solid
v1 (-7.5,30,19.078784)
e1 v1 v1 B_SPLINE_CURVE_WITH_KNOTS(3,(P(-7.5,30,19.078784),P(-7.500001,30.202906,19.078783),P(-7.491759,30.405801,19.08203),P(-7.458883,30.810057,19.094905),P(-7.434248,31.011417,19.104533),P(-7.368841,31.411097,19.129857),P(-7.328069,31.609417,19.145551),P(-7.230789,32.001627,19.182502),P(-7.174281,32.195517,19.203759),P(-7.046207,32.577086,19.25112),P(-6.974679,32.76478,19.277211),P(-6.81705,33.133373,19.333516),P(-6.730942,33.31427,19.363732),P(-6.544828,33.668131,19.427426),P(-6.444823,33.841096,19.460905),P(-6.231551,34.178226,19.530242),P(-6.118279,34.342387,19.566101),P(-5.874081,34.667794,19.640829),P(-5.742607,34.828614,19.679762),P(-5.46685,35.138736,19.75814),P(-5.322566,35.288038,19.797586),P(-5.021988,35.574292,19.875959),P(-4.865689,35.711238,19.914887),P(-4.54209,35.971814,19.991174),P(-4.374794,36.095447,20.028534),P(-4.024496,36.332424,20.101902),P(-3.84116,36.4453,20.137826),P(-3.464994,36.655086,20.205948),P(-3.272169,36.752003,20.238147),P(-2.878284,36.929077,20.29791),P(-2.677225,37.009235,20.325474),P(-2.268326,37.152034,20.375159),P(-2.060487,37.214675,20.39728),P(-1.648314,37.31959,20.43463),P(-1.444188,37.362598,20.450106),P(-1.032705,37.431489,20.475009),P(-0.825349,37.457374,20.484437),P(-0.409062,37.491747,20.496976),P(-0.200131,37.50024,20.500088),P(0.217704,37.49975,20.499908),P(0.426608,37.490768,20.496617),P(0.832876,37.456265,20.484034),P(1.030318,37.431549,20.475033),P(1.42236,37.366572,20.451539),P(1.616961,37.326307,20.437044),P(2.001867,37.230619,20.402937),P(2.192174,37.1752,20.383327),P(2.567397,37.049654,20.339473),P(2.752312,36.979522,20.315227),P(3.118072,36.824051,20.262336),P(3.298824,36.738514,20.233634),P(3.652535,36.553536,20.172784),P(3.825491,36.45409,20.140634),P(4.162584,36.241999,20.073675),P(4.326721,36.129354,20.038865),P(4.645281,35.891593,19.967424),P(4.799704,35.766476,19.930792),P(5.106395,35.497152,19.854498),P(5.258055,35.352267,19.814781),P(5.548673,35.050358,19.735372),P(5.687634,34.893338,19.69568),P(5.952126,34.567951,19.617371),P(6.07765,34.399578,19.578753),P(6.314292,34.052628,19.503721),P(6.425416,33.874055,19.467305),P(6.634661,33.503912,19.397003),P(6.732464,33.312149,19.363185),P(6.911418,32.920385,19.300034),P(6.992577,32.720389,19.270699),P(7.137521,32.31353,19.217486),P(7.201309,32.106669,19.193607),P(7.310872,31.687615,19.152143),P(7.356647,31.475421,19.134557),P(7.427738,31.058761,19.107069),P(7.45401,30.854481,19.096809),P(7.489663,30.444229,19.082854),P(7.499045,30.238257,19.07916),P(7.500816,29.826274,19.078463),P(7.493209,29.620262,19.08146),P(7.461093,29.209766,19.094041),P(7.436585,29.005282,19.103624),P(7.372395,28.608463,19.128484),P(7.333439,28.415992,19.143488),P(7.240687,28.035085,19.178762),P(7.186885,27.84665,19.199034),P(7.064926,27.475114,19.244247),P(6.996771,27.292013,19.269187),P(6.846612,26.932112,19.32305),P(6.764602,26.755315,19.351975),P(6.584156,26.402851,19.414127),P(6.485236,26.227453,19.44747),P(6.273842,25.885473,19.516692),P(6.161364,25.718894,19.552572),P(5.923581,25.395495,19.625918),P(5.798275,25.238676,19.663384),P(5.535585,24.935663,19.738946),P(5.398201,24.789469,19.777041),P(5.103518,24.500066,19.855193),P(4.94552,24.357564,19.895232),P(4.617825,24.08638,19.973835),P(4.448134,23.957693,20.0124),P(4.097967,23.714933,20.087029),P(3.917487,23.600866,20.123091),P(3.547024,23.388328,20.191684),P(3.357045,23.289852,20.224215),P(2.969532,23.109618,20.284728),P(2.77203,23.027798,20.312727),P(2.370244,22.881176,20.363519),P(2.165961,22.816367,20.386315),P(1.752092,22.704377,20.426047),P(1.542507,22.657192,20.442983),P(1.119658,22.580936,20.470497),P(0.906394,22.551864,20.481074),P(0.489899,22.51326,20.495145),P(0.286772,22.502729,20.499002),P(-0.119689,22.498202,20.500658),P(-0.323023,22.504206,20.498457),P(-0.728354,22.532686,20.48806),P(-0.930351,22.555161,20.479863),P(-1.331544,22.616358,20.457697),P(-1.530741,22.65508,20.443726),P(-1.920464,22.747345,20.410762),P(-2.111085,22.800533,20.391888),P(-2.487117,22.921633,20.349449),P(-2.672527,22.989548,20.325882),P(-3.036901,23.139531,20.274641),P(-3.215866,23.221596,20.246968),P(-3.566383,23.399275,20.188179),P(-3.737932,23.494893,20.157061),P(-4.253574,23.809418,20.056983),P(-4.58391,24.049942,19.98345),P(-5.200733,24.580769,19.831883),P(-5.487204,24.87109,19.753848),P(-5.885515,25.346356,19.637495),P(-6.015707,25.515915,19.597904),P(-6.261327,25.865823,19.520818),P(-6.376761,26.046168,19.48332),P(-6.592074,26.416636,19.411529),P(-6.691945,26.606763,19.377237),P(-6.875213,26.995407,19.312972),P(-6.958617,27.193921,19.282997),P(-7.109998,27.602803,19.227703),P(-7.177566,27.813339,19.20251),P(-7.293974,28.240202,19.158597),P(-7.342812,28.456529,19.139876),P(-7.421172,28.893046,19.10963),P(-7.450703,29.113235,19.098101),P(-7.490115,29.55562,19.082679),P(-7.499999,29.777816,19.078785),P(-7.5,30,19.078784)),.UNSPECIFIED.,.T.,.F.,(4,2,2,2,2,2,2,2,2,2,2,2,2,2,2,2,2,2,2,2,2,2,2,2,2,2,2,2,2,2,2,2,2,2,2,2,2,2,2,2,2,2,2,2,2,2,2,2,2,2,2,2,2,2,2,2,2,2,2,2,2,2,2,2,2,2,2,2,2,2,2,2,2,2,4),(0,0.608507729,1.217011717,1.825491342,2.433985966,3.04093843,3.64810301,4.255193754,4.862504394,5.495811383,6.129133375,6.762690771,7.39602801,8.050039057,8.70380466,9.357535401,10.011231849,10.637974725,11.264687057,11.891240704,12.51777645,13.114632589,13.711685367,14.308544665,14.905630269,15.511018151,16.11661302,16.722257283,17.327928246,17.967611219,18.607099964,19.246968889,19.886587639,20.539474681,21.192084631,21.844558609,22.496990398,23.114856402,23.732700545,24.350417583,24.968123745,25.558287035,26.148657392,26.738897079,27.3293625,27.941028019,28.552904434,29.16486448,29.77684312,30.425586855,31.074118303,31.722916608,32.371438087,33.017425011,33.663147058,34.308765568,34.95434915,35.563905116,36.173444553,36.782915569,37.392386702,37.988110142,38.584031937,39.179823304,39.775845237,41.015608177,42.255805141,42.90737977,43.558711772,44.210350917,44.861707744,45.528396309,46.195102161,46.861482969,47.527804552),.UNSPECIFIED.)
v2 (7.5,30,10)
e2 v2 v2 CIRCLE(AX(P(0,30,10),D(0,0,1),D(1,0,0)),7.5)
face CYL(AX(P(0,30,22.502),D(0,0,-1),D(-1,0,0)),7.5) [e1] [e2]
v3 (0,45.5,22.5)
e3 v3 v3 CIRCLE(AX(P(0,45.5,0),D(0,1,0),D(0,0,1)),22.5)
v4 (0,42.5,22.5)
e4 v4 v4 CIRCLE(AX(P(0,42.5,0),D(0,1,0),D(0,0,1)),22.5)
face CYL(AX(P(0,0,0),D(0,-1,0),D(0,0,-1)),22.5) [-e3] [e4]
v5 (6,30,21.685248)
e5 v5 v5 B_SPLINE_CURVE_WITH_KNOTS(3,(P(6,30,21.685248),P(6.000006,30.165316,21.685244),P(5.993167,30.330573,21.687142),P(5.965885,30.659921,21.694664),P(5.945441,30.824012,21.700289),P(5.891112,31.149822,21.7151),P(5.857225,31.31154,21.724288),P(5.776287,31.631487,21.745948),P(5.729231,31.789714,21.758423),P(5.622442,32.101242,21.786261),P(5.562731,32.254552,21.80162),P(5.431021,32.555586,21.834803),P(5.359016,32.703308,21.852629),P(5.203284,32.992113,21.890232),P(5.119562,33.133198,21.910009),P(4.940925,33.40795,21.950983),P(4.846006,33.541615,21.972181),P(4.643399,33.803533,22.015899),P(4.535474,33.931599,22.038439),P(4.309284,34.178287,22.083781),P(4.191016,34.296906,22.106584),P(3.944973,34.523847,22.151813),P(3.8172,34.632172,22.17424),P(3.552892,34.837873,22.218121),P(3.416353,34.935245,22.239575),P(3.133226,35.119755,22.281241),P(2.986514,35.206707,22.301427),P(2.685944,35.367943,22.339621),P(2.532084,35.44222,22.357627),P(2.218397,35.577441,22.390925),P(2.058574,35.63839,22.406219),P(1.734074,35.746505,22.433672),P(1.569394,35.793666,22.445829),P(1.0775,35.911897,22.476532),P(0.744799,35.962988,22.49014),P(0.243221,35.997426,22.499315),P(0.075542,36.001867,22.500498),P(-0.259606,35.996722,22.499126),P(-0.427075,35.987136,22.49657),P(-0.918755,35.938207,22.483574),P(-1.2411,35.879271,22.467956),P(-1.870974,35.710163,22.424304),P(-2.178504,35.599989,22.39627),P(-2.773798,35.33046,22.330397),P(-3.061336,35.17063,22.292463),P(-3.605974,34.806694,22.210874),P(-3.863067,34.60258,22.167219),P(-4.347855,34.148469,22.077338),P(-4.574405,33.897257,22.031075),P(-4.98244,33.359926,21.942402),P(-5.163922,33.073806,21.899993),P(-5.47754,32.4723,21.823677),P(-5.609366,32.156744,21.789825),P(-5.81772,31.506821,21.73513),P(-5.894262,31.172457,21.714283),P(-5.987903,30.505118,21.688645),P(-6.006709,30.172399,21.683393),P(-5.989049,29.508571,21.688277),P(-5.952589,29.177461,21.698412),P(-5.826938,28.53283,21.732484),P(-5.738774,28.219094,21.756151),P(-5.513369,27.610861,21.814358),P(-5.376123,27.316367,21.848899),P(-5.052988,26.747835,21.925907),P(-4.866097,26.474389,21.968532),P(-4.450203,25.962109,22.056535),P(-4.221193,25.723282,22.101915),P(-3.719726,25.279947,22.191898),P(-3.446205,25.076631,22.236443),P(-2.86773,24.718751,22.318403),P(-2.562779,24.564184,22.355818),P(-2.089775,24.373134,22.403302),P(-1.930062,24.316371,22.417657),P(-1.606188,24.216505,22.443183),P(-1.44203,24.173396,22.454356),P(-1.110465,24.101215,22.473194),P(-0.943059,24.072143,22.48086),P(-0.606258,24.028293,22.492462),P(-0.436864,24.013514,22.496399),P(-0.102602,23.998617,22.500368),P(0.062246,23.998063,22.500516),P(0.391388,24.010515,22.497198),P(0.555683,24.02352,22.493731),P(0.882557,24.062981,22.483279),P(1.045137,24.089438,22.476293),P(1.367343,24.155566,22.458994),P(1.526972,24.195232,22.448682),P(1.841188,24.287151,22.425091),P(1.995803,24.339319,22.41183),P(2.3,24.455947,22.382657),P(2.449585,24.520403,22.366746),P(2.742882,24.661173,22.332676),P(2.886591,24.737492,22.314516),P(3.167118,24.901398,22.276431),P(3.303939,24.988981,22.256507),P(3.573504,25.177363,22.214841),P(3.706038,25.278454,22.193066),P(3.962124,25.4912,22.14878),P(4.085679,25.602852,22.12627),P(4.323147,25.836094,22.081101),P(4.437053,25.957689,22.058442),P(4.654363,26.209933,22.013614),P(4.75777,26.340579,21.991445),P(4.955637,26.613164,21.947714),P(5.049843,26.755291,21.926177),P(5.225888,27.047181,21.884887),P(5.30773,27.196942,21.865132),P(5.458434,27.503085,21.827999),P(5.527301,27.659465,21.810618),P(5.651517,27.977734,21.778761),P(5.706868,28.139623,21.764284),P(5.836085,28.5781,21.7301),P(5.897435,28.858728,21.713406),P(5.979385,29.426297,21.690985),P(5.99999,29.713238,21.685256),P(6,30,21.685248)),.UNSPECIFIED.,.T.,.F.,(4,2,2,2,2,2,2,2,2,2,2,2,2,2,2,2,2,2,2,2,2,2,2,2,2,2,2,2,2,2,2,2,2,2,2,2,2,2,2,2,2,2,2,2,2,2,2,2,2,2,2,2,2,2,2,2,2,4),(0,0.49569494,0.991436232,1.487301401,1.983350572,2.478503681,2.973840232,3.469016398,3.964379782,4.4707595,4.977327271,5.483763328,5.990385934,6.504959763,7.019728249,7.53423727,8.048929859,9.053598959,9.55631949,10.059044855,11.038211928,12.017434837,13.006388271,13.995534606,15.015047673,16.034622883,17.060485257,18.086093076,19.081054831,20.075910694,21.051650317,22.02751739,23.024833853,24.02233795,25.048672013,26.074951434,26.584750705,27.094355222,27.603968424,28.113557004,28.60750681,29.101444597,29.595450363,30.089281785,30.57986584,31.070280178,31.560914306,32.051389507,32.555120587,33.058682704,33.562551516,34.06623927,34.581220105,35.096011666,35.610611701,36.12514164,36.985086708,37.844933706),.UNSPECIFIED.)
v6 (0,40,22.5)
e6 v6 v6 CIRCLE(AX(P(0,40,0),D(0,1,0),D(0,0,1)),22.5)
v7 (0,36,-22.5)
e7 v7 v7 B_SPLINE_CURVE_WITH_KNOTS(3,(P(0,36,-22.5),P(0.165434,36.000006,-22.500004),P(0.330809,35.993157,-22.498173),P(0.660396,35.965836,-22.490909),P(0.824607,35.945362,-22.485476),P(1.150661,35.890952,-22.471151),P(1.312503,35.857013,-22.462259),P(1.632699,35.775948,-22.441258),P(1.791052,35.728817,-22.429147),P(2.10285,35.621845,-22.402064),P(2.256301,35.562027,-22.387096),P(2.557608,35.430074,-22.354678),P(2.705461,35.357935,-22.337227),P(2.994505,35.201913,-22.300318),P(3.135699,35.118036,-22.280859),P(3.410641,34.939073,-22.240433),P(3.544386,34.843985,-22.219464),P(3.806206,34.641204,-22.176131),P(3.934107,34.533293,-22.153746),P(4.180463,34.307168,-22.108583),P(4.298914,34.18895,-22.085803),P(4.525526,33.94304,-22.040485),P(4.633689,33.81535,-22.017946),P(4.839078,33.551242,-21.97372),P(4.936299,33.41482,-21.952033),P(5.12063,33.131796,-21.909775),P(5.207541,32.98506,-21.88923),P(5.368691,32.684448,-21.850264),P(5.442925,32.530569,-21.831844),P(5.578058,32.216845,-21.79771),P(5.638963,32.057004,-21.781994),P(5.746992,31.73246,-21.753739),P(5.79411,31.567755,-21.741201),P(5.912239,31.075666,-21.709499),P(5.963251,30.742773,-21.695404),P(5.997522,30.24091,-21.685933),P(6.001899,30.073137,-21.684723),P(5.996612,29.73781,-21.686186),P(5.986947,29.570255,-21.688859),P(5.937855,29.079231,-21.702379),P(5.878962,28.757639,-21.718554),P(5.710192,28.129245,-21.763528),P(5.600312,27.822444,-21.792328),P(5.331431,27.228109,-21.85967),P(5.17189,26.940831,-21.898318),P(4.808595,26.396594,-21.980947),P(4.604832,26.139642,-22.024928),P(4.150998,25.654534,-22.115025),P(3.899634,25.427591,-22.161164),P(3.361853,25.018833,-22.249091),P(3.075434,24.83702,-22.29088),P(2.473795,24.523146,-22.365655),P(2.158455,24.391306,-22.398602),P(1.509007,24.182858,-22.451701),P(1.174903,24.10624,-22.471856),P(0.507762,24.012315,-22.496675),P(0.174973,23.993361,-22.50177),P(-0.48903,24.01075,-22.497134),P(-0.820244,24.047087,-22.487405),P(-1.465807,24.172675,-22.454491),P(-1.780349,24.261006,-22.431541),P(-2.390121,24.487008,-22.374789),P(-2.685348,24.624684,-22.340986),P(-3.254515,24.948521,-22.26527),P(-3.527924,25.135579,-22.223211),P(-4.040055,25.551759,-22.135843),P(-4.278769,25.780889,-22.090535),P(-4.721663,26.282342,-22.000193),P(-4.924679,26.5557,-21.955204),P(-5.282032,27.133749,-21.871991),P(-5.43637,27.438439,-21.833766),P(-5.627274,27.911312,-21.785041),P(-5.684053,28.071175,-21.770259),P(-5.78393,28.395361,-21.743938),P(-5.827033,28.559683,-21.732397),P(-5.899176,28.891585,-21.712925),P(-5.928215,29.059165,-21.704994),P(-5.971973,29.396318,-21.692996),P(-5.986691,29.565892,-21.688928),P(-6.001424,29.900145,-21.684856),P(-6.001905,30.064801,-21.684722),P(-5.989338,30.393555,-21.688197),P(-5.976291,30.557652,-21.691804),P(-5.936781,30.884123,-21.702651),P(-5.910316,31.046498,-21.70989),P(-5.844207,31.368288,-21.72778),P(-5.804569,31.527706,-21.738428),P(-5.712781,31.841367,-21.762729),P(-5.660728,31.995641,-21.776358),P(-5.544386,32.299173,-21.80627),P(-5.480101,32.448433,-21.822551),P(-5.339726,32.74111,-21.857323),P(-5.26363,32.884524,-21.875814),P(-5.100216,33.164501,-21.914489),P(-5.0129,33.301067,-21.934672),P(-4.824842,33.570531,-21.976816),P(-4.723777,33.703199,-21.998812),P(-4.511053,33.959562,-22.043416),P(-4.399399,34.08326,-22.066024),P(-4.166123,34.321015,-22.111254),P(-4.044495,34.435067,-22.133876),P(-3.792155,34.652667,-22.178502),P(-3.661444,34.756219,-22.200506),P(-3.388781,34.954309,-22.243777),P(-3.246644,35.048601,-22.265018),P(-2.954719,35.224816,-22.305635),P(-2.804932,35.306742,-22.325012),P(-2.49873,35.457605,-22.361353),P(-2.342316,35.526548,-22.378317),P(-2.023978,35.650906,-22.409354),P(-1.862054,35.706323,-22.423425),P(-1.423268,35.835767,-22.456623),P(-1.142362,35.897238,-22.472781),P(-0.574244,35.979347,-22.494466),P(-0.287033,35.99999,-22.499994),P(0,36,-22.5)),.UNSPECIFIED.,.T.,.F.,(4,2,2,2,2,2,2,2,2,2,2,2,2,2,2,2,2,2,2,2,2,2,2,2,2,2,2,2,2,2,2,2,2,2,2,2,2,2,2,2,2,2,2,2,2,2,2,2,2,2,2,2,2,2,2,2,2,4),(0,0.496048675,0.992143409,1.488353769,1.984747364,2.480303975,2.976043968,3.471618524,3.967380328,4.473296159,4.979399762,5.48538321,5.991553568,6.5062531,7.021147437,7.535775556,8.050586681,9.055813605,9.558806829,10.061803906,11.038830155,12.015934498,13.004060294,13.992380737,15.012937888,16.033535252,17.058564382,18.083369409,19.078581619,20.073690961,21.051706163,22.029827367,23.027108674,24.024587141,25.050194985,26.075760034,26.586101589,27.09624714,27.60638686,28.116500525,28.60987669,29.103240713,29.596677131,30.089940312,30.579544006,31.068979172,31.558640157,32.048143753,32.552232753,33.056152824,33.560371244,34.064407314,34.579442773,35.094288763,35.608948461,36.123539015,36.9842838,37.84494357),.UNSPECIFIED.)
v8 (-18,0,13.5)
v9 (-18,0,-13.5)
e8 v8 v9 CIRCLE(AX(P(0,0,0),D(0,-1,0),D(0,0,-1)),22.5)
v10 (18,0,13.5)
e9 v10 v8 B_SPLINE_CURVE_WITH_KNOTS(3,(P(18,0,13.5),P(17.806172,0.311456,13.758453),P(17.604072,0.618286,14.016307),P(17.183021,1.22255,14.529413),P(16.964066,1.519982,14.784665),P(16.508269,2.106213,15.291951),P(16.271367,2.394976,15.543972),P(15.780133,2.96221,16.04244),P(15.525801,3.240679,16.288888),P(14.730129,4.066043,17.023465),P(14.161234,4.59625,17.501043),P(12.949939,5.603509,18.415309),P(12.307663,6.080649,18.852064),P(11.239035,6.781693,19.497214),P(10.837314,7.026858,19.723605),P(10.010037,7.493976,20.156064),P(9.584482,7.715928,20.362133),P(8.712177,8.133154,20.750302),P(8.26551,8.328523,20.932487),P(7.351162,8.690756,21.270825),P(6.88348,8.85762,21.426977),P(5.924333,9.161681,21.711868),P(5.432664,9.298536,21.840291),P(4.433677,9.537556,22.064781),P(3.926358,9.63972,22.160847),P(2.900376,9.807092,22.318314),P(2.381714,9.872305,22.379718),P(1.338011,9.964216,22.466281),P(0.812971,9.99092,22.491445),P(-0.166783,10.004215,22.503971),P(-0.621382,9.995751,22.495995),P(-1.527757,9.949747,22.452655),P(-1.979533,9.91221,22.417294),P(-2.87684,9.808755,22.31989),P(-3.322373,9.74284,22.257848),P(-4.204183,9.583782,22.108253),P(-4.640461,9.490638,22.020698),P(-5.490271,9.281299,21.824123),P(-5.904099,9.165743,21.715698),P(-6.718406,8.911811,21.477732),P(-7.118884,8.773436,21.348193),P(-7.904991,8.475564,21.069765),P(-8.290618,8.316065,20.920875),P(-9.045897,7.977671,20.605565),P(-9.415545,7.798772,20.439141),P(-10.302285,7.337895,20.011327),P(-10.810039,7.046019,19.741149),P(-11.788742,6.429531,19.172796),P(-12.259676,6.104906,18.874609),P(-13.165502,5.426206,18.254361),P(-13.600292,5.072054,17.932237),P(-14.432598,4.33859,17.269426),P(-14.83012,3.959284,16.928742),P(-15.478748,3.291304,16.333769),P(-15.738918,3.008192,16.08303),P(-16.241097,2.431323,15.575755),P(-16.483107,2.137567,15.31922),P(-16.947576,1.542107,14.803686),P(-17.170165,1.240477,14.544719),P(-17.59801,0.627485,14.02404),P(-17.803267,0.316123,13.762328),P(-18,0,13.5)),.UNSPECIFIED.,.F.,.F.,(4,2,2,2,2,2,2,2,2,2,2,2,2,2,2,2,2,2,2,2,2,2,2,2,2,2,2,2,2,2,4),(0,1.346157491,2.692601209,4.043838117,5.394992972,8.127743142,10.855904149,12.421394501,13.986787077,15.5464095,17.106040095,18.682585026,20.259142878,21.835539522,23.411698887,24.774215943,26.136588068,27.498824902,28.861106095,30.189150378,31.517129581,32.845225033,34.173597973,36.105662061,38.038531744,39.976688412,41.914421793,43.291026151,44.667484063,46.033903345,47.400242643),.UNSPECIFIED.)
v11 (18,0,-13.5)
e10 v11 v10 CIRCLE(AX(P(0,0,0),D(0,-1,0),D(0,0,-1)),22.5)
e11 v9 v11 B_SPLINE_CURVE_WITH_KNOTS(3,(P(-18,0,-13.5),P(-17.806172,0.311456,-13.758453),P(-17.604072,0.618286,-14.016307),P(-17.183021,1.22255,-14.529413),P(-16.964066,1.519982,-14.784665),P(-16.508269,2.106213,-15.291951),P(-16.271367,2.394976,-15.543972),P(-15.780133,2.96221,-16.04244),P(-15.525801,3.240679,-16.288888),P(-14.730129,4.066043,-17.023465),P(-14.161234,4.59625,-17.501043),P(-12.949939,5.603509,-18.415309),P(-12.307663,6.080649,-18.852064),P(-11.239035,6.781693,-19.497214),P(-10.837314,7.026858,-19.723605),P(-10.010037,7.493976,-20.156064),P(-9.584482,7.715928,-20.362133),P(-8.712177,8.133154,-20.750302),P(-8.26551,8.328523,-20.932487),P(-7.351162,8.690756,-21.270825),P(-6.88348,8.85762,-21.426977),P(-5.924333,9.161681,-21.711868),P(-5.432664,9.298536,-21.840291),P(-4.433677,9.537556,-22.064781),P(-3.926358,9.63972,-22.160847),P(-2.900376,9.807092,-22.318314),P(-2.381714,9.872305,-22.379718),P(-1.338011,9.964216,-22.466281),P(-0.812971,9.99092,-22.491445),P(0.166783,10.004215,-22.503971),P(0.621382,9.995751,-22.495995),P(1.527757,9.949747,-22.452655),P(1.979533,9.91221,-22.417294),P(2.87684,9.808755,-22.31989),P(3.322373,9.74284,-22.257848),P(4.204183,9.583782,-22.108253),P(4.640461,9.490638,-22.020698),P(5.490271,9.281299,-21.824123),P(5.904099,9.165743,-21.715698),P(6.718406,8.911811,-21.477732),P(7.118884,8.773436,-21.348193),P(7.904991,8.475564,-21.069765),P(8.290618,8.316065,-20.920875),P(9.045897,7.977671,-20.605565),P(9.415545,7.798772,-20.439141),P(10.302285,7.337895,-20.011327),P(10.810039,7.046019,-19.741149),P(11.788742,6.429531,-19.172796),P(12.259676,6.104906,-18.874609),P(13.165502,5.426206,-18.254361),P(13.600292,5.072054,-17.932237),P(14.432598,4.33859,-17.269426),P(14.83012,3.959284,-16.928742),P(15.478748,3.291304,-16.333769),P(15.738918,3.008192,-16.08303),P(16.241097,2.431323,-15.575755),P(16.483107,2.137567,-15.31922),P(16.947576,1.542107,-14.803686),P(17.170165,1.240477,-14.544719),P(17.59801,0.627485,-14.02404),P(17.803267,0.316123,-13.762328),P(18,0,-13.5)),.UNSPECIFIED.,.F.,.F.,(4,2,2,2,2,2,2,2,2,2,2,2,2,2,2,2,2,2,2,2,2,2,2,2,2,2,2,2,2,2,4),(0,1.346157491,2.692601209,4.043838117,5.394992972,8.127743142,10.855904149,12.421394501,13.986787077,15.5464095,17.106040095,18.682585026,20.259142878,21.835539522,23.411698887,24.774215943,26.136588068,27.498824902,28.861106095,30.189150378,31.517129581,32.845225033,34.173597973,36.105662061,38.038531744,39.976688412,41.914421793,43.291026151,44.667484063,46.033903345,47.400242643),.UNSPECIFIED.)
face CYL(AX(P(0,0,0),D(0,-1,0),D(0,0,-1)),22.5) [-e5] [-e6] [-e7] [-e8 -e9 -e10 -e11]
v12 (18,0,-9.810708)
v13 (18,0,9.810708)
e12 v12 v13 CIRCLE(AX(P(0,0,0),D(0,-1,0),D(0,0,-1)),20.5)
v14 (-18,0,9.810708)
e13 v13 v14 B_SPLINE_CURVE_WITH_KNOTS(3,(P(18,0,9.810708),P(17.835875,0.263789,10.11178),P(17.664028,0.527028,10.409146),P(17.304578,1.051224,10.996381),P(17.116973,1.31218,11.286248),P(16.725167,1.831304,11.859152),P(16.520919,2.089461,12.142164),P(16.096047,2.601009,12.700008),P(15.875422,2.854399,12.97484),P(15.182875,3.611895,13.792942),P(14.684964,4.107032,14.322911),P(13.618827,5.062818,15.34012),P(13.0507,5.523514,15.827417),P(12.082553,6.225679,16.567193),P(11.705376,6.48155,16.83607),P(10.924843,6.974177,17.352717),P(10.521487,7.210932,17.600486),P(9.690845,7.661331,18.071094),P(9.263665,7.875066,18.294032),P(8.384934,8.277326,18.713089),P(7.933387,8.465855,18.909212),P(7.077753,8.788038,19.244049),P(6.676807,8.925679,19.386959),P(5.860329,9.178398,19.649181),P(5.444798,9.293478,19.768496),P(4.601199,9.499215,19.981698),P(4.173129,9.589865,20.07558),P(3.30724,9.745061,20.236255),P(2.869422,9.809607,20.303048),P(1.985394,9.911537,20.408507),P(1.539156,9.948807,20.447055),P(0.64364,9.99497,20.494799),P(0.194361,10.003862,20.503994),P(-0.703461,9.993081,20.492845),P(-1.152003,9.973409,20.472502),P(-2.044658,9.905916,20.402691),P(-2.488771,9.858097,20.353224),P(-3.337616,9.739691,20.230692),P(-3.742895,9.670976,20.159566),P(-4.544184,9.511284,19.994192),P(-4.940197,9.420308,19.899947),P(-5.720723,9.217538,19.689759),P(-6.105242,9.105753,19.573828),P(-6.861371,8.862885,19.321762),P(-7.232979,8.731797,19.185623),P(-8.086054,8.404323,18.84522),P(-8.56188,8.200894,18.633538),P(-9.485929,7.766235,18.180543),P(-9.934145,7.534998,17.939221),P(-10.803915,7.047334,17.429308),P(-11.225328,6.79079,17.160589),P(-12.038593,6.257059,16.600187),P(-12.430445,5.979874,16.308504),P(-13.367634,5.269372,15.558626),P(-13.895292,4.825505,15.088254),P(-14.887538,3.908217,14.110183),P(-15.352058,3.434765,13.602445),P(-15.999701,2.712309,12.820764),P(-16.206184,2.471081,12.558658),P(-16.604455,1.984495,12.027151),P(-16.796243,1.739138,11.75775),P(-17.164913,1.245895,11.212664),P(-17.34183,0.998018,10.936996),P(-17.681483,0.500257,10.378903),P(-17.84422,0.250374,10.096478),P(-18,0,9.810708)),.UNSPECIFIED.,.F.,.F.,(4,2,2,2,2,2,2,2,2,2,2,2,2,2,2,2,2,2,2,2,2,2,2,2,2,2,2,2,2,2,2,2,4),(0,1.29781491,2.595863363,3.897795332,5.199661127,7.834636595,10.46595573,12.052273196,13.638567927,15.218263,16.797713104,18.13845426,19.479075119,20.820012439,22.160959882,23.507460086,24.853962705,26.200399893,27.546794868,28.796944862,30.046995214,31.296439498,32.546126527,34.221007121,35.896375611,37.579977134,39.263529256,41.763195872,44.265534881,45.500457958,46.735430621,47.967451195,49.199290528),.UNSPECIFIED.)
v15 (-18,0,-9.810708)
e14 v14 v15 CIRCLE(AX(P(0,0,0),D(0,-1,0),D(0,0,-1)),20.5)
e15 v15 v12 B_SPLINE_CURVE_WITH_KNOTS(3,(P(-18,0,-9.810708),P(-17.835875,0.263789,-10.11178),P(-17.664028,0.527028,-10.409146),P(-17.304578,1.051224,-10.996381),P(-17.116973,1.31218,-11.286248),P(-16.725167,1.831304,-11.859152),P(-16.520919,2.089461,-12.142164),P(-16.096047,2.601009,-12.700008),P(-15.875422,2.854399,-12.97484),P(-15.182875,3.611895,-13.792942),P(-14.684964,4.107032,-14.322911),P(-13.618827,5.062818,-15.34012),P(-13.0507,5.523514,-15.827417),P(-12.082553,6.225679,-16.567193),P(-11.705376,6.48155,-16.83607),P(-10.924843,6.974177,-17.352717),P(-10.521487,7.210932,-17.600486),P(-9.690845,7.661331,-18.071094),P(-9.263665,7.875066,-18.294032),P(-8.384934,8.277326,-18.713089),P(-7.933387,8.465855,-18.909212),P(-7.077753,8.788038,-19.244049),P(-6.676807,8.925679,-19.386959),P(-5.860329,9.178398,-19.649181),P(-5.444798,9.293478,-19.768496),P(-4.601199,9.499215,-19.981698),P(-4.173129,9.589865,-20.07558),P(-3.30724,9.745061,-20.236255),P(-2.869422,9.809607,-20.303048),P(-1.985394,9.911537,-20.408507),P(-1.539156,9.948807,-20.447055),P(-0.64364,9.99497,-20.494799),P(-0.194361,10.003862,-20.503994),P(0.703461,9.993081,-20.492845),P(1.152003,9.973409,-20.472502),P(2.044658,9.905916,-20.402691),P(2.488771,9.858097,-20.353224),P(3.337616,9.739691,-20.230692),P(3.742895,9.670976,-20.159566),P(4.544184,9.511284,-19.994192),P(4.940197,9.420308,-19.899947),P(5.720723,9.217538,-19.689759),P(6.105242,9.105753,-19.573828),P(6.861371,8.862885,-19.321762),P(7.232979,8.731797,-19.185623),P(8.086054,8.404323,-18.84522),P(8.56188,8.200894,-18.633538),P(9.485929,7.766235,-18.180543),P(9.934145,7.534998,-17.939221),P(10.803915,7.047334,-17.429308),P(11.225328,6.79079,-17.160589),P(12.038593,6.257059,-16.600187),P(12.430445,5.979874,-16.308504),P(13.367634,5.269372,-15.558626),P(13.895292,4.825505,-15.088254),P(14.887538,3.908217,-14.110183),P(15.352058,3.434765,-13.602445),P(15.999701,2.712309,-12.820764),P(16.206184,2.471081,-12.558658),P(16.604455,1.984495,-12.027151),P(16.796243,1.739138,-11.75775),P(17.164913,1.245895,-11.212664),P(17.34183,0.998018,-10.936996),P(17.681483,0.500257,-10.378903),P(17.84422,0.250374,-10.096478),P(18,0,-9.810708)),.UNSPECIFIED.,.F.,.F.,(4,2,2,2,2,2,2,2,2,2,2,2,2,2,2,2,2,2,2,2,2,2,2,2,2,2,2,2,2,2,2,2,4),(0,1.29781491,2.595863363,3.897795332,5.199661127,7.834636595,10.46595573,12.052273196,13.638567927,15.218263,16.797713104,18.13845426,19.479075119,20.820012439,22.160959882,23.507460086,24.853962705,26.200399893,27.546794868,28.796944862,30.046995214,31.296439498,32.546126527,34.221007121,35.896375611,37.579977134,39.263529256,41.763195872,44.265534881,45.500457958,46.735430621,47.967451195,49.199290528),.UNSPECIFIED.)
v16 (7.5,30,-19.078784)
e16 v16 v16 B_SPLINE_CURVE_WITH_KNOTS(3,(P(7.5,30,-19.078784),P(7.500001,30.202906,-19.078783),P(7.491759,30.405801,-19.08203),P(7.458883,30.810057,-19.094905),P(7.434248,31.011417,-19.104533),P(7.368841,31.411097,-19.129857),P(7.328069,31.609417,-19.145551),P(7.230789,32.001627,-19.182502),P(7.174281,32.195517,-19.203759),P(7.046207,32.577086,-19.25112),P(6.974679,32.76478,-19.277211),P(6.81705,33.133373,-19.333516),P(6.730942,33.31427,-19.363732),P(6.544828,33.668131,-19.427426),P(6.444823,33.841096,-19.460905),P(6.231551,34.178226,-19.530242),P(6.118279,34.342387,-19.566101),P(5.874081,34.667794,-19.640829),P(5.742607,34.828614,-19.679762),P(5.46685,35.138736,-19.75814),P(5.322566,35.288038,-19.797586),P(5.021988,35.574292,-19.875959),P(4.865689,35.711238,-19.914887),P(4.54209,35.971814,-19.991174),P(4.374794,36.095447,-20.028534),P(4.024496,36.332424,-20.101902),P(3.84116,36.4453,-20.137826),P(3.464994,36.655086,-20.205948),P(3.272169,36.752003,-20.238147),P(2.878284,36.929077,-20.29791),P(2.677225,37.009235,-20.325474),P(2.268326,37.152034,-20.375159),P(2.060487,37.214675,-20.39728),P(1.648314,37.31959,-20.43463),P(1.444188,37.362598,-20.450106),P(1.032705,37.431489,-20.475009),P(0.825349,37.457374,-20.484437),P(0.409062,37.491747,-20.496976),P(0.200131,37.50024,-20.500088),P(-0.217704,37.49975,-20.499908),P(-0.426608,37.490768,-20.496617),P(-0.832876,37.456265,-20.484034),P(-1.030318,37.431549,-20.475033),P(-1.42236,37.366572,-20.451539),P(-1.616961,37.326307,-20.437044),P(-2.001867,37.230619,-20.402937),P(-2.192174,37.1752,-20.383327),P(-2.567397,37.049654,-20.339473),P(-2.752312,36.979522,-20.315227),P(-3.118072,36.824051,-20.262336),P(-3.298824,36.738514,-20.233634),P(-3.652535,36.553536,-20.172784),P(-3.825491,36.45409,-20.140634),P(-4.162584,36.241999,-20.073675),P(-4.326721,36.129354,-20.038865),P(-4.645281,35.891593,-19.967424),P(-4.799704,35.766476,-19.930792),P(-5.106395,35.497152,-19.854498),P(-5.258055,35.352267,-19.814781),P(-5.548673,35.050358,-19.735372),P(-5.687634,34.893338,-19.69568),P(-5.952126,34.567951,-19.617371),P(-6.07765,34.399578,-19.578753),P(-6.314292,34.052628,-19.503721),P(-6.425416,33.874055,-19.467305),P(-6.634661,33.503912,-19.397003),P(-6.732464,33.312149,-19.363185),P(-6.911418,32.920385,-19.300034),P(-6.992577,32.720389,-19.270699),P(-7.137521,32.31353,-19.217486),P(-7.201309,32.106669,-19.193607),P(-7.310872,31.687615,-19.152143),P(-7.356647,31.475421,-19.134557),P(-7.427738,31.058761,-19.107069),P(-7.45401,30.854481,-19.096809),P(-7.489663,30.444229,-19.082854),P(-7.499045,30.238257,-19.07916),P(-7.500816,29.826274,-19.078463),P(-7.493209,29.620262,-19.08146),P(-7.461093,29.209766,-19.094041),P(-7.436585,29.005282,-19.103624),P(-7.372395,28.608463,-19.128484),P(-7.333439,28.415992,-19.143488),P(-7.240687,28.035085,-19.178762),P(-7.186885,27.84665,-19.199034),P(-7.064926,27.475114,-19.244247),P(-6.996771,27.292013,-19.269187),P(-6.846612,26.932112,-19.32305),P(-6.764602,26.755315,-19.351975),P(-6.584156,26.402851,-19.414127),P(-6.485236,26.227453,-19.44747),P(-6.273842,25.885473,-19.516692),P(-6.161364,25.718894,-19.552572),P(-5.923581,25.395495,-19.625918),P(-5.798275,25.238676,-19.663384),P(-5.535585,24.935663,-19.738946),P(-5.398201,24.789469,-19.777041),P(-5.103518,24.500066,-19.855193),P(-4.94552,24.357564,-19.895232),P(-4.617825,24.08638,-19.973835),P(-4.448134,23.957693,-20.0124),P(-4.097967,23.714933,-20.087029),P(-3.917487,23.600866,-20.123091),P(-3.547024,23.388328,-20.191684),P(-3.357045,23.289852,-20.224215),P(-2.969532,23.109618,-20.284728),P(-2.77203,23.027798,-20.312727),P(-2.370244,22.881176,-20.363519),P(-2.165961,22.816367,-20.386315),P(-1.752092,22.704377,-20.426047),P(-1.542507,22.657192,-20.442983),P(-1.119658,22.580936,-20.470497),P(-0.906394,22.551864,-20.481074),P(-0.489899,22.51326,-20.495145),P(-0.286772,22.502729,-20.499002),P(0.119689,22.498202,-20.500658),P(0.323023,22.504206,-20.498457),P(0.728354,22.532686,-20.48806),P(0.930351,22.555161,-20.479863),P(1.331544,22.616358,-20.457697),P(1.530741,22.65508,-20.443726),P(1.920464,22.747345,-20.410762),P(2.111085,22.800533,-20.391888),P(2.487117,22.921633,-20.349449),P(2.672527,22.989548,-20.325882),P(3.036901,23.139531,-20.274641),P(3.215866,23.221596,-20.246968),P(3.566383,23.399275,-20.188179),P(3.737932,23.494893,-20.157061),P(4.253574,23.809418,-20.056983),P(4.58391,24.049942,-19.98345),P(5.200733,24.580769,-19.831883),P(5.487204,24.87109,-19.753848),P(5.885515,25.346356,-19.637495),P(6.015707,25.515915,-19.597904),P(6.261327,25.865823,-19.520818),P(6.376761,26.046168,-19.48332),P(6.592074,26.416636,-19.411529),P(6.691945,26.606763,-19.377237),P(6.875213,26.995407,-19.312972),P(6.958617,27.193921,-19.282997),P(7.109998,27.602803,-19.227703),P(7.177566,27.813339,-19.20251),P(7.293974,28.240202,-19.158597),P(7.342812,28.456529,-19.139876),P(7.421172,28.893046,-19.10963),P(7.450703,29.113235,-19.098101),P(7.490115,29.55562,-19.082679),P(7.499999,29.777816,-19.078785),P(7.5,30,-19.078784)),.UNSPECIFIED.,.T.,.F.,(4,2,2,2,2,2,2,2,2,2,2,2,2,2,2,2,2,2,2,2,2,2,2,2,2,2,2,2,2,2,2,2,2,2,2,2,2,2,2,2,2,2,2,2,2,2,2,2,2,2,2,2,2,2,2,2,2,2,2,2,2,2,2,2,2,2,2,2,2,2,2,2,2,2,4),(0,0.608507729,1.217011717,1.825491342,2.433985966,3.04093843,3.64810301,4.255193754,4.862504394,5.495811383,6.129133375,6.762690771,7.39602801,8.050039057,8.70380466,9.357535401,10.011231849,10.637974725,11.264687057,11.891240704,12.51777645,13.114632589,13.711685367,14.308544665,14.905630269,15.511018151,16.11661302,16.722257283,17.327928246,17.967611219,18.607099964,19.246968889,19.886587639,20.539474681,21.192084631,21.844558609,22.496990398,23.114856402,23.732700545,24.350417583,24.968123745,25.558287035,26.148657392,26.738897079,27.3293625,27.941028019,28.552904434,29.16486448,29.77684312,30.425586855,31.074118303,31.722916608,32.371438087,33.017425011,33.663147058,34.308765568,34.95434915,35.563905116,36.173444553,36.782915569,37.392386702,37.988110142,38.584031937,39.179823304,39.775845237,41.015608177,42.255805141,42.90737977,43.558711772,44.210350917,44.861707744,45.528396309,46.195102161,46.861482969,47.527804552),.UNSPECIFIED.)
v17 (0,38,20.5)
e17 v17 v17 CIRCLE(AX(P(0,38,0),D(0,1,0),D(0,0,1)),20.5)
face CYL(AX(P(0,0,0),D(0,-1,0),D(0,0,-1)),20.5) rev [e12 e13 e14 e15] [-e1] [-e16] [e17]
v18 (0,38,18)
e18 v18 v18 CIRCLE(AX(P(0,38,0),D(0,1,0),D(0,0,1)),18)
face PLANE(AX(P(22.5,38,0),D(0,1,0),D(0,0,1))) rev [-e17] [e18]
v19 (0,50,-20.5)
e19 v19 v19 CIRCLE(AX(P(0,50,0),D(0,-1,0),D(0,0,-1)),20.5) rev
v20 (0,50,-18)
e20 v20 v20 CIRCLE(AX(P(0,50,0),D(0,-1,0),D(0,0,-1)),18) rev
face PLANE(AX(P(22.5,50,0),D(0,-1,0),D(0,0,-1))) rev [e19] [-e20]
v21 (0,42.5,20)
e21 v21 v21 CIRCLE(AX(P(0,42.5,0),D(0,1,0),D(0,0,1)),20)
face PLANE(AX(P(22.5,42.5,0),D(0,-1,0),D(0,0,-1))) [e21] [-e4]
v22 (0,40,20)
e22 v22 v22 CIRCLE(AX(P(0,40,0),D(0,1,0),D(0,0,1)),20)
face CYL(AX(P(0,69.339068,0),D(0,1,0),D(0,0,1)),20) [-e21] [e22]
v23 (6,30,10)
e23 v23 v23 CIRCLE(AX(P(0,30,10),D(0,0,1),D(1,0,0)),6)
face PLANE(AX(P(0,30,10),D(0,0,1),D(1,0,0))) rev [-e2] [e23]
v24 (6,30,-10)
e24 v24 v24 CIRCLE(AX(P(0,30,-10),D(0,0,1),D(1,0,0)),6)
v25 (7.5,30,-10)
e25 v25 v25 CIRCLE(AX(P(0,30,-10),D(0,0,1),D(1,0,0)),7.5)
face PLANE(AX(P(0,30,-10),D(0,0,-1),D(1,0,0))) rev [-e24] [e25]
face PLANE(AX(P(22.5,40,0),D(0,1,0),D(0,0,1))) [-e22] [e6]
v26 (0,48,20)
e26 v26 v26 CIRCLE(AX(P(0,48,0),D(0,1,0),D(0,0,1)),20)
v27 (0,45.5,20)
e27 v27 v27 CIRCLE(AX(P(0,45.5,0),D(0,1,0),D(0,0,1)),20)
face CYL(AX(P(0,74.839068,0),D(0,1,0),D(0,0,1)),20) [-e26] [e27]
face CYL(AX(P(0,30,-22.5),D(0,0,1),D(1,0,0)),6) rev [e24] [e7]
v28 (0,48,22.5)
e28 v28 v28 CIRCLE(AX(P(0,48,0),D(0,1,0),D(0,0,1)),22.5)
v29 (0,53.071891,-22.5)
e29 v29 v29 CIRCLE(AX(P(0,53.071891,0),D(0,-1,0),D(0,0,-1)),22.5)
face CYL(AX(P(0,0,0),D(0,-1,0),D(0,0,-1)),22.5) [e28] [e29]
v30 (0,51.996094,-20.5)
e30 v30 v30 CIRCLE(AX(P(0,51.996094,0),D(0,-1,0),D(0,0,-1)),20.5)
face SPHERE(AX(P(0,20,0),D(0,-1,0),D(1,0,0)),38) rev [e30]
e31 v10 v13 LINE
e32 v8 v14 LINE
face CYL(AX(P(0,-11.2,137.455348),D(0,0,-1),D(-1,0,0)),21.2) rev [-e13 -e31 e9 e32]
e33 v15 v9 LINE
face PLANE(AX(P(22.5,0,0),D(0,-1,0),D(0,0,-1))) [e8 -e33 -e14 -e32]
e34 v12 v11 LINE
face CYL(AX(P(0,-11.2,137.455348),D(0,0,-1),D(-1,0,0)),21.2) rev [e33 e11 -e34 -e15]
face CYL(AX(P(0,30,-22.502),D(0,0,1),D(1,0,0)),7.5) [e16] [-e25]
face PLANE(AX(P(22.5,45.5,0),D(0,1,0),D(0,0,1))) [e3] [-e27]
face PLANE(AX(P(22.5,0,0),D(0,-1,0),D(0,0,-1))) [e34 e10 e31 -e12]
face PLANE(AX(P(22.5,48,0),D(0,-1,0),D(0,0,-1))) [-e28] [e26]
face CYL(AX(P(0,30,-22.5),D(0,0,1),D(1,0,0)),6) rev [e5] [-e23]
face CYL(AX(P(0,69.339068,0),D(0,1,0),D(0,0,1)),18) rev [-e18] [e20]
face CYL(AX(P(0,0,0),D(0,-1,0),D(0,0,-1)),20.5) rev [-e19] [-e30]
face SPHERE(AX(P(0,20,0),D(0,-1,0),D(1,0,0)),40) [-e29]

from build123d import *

# Parameters (mm, degrees)
SZKIC3_W                         = 2.5
SZKIC3_H                         = 2.5
SZYK_LINIOWY1_COUNT              = 2
SZYK_LINIOWY1_PITCH              = 5.5
WYTNIJ_WYCI_GNI_CIE1_DEPTH       = 68.915388536
WYTNIJ_WYCI_GNI_CIE1_DEPTH_BACK  = 68.915388536
WYTNIJ_WYCI_GNI_CIE3_DEPTH       = 68.915388602
WYTNIJ_WYCI_GNI_CIE3_DEPTH_BACK  = 68.915388602
SZKIC5_R                         = 6
DODANIE_WYCI_GNI_CIE1_REACH      = 79.915
DODANIE_WYCI_GNI_CIE1_END_RADIUS = 20.5
DODANIE_WYCI_GNI_CIE1_START      = 10
SZKIC6_R                         = 7.5
SZKIC6_R_2                       = 6


# Read off the part's stored shape, not the designer's step: Skorupa1
with BuildPart() as part:
    # Szkic1 → Obrót1 (revolve)
    with BuildSketch(Plane.XY):
        with BuildLine():
            Line((0, 0), (0, 60))
            ThreePointArc((0, 60), (11.771243445, 58.228756555), (22.5, 53.071891388))
            Line((22.5, 53.071891388), (22.5, 0))
            Line((22.5, 0), (0, 0))
        make_face()
    revolve(axis=Axis((0, 0, 0), (0, 1, 0)))

    # Szkic3 → Wycięcie-obrót1 (revolve, cut)
    with BuildSketch(Plane.XY, mode=Mode.PRIVATE) as wyci_cie_obr_t1_sk:
        with Locations((21.25, 41.25)):
            Rectangle(SZKIC3_W, SZKIC3_H)
    wyci_cie_obr_t1 = revolve(wyci_cie_obr_t1_sk.sketch.rotate(Axis((0, 69.339068265, 0), (0, 1, 0)), 90), axis=Axis((0, 69.339068265, 0), (0, 1, 0)), mode=Mode.SUBTRACT)

    # Szyk liniowy1: Wycięcie-obrót1 ×2
    with Locations(*[(0, i * SZYK_LINIOWY1_PITCH, 0) for i in range(1, SZYK_LINIOWY1_COUNT)]):
        add(wyci_cie_obr_t1, mode=Mode.SUBTRACT)

    # Skorupa1 outline → Skorupa1 (revolve, cut)
    with BuildSketch(Plane.XY):
        with BuildLine():
            Line((20.5, 0), (20.5, 38))
            Line((20.5, 38), (18, 38))
            Line((18, 38), (18, 50))
            Line((18, 50), (20.5, 50))
            Line((20.5, 50), (20.500000011, 51.996093505))
            ThreePointArc((20.500000011, 51.996093505), (10.680553516, 56.468147425), (0, 58))
            Line((0, 58), (0, 0))
            Line((0, 0), (20.5, 0))
        make_face()
    revolve(axis=Axis((0, 0, 0), (0, 1, 0)), mode=Mode.SUBTRACT)

    # Szkic4 → Wytnij-wyciągnięcie1 (cut, two sides: drawn at the far end of the back side and taken through both)
    with BuildSketch(Plane.XY.offset(-WYTNIJ_WYCI_GNI_CIE1_DEPTH_BACK)):
        with BuildLine():
            Line((-99.770112831, -131.416252764), (-18, 0))
            ThreePointArc((-18, 0), (0, 10), (18, 0))
            Line((18, 0), (99.770112831, -131.416252764))
            Line((99.770112831, -131.416252764), (99.770112831, -440.974537052))
            Line((99.770112831, -440.974537052), (-99.770112831, -440.974537052))
            Line((-99.770112831, -440.974537052), (-99.770112831, -131.416252764))
        make_face()
    extrude(amount=WYTNIJ_WYCI_GNI_CIE1_DEPTH + WYTNIJ_WYCI_GNI_CIE1_DEPTH_BACK, mode=Mode.SUBTRACT)

    # Szkic5 → Wytnij-wyciągnięcie3 (cut, two sides: drawn at the far end of the back side and taken through both)
    with BuildSketch(Plane.XY.offset(-WYTNIJ_WYCI_GNI_CIE3_DEPTH_BACK)):
        with Locations((0, 30)):
            Circle(SZKIC5_R)
    extrude(amount=WYTNIJ_WYCI_GNI_CIE3_DEPTH + WYTNIJ_WYCI_GNI_CIE3_DEPTH_BACK, mode=Mode.SUBTRACT)

    # Dodanie-wyciągnięcie1: up to this cylinder (the profile starts inside it)
    dodanie_wyci_gni_cie1_end = Plane(origin=(0, 30, 0), z_dir=(0, -1, 0)) * Cylinder(DODANIE_WYCI_GNI_CIE1_END_RADIUS, 201.83, mode=Mode.PRIVATE)
    # Szkic6 → Dodanie-wyciągnięcie1 (add, up to the surface)
    with BuildSketch(Plane.XY.offset(DODANIE_WYCI_GNI_CIE1_START), mode=Mode.PRIVATE) as dodanie_wyci_gni_cie1_sk1:
        with Locations(Location((0, 30, 0), (0, 0, 180))):
            Circle(SZKIC6_R)
        with Locations((0, 30)):
            Circle(SZKIC6_R_2, mode=Mode.SUBTRACT)
    dodanie_wyci_gni_cie1_tool1 = extrude(dodanie_wyci_gni_cie1_sk1.sketch, amount=DODANIE_WYCI_GNI_CIE1_REACH, mode=Mode.PRIVATE) & dodanie_wyci_gni_cie1_end
    dodanie_wyci_gni_cie1 = dodanie_wyci_gni_cie1_tool1.solids().sort_by_distance((7.287868, 30, 10))[0]
    add(dodanie_wyci_gni_cie1)

    # Lustro1: Dodanie-wyciągnięcie1 across plane
    add(dodanie_wyci_gni_cie1.mirror(Plane.XY))


solid = part.part
